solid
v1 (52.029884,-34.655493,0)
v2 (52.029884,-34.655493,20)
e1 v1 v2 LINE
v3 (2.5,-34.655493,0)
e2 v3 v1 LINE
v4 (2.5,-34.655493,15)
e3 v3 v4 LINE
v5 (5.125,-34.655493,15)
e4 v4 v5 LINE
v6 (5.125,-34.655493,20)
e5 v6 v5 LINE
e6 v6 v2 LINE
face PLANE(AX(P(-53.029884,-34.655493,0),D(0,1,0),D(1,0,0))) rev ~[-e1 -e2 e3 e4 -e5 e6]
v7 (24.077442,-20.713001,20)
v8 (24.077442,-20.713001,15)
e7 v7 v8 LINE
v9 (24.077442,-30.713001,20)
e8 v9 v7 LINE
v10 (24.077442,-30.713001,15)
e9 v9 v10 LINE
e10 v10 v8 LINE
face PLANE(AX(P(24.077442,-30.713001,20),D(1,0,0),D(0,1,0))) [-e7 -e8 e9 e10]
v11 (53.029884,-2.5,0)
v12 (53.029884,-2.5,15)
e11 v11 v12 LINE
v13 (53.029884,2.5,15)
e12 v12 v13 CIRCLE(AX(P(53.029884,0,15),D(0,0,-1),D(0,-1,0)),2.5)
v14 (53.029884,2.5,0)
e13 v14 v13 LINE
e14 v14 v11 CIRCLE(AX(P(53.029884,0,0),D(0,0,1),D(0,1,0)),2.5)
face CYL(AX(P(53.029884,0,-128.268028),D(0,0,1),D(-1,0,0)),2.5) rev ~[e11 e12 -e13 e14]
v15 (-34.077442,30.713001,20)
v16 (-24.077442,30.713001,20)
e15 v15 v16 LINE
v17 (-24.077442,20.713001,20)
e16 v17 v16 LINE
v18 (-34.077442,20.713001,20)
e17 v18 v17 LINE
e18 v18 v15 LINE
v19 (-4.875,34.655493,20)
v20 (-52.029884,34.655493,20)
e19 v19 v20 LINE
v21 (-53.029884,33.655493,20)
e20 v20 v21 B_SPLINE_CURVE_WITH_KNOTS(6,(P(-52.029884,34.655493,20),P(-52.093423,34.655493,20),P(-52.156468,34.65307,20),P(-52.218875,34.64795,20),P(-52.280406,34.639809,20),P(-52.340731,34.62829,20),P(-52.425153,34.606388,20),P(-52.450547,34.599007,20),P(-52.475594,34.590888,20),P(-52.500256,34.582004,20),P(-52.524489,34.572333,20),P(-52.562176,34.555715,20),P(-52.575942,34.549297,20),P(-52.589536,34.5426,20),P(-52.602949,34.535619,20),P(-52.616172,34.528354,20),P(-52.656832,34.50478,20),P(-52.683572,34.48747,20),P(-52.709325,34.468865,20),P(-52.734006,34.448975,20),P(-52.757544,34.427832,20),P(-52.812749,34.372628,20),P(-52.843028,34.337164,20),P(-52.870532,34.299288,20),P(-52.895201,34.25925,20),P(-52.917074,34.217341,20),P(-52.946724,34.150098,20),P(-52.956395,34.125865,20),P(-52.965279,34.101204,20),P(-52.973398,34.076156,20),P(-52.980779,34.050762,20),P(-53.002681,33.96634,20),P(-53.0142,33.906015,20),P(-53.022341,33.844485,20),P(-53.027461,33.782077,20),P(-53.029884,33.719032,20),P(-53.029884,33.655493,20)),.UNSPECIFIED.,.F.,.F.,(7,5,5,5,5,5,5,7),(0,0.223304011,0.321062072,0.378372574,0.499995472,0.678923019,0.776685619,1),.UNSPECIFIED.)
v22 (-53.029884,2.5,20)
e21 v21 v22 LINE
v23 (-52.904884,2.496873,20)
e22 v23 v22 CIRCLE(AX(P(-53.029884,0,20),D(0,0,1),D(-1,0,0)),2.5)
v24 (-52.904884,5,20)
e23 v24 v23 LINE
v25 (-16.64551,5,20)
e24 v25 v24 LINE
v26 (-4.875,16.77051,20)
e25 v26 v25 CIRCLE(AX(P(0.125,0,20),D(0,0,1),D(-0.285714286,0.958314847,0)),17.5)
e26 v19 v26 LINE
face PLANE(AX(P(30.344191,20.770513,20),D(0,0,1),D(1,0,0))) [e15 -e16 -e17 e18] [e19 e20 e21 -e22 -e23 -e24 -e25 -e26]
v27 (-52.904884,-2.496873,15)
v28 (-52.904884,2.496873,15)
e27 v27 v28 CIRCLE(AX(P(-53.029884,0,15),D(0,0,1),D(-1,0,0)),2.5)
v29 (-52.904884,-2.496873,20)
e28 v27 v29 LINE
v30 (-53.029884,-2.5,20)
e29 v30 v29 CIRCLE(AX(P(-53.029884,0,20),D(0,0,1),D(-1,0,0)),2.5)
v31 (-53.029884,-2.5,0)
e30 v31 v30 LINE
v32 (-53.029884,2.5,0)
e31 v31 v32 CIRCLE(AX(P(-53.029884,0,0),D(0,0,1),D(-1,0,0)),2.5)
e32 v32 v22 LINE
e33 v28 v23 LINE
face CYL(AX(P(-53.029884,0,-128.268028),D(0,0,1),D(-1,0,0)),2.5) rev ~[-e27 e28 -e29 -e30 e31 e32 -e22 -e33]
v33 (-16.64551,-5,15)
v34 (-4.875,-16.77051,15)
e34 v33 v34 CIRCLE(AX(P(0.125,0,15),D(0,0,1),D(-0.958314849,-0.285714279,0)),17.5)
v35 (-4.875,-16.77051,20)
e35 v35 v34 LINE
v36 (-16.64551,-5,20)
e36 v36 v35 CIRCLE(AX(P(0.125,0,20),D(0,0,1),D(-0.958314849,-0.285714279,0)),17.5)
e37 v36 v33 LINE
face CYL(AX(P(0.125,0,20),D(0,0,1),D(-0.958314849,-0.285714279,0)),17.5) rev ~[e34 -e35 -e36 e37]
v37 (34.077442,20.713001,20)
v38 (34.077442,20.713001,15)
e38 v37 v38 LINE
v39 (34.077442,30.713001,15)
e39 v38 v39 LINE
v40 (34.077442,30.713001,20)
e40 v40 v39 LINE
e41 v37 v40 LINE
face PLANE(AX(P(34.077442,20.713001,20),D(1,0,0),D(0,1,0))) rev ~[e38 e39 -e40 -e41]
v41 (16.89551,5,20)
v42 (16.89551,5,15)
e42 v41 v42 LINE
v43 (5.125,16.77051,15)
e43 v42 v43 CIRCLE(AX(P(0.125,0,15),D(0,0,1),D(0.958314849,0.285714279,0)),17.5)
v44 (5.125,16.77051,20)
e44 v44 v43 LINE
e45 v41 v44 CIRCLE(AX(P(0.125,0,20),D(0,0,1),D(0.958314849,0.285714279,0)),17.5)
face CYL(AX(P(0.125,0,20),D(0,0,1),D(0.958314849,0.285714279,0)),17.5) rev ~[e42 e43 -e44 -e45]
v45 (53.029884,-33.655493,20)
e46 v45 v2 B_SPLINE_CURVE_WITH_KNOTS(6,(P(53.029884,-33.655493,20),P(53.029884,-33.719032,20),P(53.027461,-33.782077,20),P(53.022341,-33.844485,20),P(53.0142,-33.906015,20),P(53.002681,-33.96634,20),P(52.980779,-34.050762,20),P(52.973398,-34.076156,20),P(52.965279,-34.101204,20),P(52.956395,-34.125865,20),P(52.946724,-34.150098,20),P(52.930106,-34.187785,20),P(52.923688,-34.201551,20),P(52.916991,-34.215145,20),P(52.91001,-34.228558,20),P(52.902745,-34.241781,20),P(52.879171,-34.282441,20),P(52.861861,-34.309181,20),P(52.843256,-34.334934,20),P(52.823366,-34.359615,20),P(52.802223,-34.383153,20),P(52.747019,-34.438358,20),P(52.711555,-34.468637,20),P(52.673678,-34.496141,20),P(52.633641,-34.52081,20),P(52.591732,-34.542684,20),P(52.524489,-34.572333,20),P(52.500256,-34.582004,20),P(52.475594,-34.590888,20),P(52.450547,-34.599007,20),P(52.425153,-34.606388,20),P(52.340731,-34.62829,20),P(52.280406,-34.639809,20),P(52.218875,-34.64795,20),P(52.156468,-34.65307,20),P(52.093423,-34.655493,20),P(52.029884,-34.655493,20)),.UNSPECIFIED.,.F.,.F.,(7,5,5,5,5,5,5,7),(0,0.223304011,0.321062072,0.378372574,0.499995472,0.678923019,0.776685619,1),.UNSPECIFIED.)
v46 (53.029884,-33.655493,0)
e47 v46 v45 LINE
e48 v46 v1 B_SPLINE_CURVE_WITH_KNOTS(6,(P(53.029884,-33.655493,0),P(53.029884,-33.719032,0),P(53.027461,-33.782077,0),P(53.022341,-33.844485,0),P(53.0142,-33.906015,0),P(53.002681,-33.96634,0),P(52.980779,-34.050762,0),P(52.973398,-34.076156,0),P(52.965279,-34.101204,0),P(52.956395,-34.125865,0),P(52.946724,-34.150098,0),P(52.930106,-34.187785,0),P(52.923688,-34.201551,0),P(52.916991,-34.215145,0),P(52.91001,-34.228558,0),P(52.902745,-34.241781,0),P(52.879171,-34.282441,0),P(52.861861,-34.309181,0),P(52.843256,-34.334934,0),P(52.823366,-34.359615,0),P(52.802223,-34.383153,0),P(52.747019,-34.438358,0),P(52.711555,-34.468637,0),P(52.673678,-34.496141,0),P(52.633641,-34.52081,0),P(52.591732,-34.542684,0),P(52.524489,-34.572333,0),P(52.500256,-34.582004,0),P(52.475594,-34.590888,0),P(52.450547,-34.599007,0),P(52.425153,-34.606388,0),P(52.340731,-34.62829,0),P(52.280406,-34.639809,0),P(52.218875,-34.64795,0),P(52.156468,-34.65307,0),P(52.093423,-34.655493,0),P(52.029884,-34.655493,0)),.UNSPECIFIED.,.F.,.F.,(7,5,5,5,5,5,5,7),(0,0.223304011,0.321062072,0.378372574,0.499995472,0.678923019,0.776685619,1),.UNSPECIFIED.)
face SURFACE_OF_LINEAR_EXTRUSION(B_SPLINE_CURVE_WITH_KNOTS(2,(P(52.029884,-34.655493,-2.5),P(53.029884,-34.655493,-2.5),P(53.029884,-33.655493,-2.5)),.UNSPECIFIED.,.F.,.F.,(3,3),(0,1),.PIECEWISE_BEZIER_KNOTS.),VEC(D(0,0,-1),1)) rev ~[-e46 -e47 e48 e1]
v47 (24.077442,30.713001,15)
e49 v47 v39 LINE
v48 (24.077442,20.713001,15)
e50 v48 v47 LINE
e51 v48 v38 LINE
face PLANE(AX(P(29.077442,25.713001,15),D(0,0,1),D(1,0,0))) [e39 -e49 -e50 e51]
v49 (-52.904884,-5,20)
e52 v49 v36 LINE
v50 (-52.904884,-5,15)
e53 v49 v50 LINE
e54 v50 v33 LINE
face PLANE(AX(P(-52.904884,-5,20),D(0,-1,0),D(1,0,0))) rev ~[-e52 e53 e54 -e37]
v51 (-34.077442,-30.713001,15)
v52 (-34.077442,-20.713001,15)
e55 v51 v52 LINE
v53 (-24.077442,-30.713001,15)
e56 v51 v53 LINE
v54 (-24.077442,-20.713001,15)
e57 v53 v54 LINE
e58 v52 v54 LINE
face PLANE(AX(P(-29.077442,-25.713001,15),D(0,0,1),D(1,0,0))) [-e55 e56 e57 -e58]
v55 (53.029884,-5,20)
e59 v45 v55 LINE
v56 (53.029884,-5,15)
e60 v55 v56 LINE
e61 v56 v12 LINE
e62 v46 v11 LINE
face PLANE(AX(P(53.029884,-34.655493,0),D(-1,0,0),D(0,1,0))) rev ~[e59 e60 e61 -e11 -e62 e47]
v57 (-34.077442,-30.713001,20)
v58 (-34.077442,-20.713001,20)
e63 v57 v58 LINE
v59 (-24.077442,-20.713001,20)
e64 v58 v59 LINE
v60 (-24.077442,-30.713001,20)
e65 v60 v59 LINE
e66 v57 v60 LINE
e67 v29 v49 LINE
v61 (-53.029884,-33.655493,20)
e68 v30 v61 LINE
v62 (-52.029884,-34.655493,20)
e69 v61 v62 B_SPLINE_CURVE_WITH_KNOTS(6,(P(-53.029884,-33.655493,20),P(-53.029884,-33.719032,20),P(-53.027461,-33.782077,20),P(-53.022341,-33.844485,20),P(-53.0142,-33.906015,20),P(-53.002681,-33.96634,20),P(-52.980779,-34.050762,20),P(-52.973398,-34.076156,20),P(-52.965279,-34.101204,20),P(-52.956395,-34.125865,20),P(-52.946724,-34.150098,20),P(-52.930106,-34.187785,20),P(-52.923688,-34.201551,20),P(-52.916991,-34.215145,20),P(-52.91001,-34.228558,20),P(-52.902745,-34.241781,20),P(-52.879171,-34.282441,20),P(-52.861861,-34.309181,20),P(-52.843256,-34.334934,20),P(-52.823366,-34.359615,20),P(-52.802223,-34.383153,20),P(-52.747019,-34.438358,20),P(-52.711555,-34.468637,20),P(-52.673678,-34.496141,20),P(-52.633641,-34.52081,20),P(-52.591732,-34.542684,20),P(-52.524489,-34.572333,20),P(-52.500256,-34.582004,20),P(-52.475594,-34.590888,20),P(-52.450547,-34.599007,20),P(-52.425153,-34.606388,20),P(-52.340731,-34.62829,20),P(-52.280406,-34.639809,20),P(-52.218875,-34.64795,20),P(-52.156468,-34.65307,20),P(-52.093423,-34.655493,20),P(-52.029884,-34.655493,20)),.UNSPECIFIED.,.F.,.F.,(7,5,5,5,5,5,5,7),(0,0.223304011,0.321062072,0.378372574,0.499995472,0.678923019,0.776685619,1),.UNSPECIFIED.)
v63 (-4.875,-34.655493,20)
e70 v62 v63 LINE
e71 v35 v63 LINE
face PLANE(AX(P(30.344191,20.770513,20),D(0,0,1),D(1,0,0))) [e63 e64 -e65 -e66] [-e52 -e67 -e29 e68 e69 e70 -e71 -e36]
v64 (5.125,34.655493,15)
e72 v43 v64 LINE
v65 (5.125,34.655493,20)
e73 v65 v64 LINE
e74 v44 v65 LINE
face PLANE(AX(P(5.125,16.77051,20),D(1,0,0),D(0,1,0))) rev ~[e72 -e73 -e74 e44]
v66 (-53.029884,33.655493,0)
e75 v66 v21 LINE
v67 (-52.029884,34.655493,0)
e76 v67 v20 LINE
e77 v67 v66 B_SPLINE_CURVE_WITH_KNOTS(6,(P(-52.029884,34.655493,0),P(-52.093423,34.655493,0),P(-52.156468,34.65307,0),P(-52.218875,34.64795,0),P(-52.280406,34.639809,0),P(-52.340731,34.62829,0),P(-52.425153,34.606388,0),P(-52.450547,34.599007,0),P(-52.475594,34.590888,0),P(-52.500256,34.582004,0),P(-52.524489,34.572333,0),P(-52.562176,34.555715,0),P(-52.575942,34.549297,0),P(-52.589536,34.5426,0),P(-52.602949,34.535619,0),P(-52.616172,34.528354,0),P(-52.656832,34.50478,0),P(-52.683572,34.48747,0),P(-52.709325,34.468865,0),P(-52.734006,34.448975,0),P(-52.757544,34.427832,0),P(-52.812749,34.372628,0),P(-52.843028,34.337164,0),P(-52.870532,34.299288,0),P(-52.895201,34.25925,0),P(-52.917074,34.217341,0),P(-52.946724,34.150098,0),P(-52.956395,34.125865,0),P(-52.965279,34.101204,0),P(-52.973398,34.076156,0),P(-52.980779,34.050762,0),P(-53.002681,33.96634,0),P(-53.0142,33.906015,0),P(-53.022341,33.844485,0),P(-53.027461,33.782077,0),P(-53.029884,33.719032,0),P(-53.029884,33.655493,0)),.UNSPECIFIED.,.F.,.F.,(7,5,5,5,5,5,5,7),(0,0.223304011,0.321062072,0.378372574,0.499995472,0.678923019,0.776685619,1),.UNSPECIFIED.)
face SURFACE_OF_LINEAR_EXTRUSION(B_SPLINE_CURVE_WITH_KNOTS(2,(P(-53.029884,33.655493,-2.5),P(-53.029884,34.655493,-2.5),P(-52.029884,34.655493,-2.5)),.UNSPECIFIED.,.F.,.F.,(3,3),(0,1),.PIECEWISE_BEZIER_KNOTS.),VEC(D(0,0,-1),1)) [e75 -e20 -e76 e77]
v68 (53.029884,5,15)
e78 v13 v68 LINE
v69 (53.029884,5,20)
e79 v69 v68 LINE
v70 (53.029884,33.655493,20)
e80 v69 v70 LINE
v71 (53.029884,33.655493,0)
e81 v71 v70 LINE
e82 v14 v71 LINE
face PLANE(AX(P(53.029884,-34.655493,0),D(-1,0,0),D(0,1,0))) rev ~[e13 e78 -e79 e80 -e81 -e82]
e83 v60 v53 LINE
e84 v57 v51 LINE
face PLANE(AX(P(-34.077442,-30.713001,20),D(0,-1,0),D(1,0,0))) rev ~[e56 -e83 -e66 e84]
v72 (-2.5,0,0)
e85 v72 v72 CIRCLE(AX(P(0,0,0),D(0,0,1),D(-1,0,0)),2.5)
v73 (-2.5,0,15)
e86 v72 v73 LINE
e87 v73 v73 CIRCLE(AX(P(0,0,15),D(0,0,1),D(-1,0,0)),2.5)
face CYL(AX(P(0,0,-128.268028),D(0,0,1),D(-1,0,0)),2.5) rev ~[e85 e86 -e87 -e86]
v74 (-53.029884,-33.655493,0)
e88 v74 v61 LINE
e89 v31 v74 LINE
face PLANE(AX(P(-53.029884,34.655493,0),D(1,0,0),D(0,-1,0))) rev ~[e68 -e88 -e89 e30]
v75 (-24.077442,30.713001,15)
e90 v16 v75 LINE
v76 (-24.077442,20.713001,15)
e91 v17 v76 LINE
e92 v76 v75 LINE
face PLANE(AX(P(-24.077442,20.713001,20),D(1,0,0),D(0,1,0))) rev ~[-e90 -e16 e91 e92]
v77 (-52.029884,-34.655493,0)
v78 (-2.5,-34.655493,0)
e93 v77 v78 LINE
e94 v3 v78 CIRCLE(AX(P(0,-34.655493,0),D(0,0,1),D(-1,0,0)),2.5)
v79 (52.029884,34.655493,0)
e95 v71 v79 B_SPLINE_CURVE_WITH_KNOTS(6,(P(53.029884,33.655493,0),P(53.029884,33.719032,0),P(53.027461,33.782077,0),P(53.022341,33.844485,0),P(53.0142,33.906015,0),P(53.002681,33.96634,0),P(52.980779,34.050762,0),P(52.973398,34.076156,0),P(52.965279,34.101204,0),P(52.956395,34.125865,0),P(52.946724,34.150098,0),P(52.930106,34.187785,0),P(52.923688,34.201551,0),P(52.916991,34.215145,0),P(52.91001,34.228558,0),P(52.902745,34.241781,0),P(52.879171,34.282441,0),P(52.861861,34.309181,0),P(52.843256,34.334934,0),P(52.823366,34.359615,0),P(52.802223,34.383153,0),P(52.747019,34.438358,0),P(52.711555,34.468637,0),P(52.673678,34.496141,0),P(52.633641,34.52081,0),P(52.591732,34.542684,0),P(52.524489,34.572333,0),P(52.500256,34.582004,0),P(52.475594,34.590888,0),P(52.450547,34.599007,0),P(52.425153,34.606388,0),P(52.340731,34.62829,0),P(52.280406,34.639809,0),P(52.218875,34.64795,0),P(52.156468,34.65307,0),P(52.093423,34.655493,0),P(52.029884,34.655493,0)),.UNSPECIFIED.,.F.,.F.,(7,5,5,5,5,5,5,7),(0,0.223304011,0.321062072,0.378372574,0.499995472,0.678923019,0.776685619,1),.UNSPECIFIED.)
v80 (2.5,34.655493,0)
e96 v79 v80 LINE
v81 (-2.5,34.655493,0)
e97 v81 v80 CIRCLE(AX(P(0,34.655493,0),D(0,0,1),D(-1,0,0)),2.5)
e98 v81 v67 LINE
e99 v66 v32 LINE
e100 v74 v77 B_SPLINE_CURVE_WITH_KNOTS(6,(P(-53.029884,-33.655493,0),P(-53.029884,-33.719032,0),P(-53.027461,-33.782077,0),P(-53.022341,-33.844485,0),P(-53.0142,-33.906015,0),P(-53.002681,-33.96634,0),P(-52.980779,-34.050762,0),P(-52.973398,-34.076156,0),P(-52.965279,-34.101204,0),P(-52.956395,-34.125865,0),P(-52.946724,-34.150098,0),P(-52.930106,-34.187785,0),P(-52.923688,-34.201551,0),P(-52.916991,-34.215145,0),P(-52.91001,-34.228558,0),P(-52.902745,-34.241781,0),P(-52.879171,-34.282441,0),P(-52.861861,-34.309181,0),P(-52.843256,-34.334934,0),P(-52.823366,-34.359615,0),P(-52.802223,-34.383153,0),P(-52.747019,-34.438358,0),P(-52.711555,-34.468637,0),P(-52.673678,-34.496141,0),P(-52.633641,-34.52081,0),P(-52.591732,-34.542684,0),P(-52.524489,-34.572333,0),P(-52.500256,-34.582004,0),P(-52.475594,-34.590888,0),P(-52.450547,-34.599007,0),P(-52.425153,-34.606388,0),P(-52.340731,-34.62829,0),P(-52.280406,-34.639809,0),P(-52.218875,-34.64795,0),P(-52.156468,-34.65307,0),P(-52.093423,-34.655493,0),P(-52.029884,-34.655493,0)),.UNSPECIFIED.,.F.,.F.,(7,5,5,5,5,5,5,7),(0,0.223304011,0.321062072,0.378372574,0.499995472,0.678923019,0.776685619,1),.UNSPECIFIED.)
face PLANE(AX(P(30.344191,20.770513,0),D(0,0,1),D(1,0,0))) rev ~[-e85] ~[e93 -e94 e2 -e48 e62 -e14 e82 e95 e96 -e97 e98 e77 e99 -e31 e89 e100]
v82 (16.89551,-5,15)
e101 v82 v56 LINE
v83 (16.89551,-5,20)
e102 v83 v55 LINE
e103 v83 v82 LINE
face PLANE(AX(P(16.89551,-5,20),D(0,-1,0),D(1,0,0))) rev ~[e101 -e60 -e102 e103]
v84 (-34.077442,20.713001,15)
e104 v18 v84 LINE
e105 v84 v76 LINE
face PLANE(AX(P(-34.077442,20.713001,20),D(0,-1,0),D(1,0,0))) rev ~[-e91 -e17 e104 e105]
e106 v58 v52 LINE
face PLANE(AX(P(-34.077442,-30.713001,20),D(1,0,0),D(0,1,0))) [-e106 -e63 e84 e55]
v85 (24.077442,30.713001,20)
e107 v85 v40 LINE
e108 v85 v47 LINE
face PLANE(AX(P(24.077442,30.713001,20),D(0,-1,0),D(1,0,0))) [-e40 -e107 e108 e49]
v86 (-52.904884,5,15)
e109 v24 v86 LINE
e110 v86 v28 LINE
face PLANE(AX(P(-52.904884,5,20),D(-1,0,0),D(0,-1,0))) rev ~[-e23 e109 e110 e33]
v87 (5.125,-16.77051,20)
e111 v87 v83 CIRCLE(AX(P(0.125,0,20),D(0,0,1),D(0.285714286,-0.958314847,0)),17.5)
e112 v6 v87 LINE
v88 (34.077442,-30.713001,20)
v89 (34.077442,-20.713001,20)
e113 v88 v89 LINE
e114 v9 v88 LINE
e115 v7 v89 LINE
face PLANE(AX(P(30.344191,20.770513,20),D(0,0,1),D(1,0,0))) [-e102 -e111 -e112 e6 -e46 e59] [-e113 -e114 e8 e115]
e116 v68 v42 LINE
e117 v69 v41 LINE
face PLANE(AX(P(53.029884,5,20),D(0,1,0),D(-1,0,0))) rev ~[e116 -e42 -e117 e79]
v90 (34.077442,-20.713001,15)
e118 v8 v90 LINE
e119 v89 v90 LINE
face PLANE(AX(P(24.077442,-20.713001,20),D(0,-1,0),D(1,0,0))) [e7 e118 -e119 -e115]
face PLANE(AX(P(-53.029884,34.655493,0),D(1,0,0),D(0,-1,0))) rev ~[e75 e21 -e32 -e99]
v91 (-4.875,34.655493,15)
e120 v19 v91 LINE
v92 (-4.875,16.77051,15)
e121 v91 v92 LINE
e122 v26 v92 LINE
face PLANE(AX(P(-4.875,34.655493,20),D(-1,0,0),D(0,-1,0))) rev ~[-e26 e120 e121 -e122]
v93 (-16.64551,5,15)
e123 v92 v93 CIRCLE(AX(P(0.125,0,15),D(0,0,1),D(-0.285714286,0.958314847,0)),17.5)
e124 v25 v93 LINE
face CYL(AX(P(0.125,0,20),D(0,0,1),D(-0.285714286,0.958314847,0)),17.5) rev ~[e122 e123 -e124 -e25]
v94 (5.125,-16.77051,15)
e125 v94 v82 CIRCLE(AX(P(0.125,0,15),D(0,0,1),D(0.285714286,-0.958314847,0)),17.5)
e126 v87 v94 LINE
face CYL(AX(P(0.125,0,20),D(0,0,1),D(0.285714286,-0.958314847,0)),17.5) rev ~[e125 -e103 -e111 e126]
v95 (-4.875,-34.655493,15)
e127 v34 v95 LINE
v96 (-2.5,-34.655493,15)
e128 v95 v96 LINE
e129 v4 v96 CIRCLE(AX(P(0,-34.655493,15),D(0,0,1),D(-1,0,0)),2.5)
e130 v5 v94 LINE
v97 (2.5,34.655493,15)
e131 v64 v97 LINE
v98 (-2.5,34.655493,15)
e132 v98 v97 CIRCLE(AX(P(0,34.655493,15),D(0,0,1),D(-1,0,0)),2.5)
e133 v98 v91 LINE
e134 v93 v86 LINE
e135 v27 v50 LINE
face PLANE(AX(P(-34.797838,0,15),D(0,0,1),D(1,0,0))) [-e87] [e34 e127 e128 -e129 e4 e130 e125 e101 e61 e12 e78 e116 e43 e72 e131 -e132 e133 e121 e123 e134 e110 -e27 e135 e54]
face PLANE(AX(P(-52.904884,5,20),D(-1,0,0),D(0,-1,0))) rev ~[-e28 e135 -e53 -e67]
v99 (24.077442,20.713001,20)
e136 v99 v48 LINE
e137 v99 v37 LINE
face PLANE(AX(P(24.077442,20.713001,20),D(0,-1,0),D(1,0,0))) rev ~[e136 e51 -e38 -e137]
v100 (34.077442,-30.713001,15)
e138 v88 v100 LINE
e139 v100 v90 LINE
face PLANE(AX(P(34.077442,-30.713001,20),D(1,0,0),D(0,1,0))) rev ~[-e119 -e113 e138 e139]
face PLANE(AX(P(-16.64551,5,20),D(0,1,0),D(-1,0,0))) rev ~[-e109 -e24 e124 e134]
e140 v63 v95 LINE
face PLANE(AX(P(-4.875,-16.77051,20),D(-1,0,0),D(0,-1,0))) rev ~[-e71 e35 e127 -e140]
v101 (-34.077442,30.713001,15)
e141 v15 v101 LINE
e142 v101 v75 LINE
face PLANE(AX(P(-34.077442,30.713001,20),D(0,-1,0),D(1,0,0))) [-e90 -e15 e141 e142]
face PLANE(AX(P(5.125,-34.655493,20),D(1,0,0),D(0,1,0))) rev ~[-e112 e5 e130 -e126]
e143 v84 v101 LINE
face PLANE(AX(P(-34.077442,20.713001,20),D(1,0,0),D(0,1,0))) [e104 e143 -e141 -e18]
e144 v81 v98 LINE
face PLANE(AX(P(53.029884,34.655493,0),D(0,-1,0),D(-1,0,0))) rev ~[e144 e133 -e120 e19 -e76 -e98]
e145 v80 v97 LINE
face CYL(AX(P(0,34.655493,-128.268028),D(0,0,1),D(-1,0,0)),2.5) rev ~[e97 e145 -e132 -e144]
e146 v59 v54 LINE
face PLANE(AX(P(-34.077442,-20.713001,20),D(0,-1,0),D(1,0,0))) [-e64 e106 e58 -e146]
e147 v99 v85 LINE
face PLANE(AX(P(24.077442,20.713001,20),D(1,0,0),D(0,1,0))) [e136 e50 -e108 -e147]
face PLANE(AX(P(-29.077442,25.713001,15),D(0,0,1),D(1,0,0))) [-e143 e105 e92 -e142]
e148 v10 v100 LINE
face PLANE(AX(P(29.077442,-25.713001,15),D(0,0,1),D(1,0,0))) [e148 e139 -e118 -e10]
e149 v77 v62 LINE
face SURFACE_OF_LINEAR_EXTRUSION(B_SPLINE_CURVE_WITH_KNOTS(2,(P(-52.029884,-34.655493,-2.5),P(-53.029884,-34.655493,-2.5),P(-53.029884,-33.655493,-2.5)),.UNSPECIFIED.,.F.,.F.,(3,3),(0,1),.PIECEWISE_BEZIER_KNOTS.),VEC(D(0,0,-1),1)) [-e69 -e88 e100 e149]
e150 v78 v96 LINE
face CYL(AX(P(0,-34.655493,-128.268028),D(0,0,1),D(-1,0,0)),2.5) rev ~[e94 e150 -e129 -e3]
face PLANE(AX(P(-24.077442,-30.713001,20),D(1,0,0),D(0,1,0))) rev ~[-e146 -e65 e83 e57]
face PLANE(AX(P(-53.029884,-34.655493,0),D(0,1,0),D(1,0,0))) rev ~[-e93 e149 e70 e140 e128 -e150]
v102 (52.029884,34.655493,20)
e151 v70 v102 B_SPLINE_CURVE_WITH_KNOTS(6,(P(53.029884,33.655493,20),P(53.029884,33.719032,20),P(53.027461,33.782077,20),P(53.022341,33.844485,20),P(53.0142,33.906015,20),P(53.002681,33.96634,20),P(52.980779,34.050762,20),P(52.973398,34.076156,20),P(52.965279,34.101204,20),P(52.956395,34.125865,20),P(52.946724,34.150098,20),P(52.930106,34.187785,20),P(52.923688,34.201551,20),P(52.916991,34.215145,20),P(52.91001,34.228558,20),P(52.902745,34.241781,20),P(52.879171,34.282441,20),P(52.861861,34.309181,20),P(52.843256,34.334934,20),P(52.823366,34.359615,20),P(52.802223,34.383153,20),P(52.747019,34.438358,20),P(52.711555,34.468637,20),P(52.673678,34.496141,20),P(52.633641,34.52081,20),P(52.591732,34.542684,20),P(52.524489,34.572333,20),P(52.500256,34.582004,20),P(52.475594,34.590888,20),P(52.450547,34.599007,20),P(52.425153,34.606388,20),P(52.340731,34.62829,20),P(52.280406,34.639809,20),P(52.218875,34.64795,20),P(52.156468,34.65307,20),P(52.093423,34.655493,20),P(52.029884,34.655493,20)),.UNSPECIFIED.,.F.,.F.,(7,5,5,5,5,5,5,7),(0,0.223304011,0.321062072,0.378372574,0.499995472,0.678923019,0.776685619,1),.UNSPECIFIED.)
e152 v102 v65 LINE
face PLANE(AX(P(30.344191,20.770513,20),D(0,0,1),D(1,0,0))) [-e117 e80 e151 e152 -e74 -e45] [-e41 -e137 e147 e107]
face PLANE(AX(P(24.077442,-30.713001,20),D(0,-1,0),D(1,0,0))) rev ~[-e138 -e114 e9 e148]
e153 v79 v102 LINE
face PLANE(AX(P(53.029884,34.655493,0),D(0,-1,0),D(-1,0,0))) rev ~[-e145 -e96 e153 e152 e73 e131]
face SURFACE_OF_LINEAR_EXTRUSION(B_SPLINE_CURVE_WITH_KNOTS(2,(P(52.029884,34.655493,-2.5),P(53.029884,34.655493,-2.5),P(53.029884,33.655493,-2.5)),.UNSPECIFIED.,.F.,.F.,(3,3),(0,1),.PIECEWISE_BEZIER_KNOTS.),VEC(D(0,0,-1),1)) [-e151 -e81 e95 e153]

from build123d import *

# Parameters (mm, degrees)
F1_DEPTH    = 20
F3_DEPTH    = 5
F4_W        = 10
F4_H        = 10
F5_DEPTH    = 5
F6_D        = 5
F7_D        = 5
F8_T1_DEPTH = 25


# Not quite as in the source:
# - a fillet or chamfer that OpenCascade refuses, or shapes differently, is made with other operations: its cross-section is extruded or revolved along the edge and cut away or added


with BuildPart() as f1:
    # F0 (on Top) → F1 (new body)
    with BuildSketch(Plane.XY):
        with BuildLine():
            Line((16.7705098646, 4.9999998882), (53.0298836529, 4.9999998882))
            Line((53.0298836529, 4.9999998882), (53.0298836529, 34.6554927528))
            Line((53.0298836529, 34.6554927528), (5, 34.6554927528))
            Line((5, 34.6554927528), (5, 16.7705098312))
            ThreePointArc((5, 16.7705098312), (12.374368712, 12.3743686295), (16.7705098646, 4.9999998882))
        make_face()
        with BuildLine():
            Line((5, 16.7705098312), (5, 34.6554927528))
            Line((5, 34.6554927528), (-5, 34.6554927528))
            Line((-5, 34.6554927528), (-5, 16.7705098312))
            ThreePointArc((-5, 16.7705098312), (0, 17.5), (5, 16.7705098312))
        make_face()
        with BuildLine():
            Line((-53.0298836529, 34.6554927528), (-53.0298836529, 4.9999998882))
            Line((-53.0298836529, 4.9999998882), (-16.7705098646, 4.9999998882))
            ThreePointArc((-16.7705098646, 4.9999998882), (-12.374368712, 12.3743686295), (-5, 16.7705098312))
            Line((-5, 16.7705098312), (-5, 34.6554927528))
            Line((-5, 34.6554927528), (-53.0298836529, 34.6554927528))
        make_face()
        with BuildLine():
            Line((-53.0298836529, -34.6554927528), (-5, -34.6554927528))
            Line((-5, -34.6554927528), (-5, -16.7705098312))
            ThreePointArc((-5, -16.7705098312), (-12.374368712, -12.3743686295), (-16.7705098646, -4.9999998882))
            Line((-16.7705098646, -4.9999998882), (-53.0298836529, -4.9999998882))
            Line((-53.0298836529, -4.9999998882), (-53.0298836529, -34.6554927528))
        make_face()
        with BuildLine():
            Line((5, -34.6554927528), (53.0298836529, -34.6554927528))
            Line((53.0298836529, -34.6554927528), (53.0298836529, -4.9999998882))
            Line((53.0298836529, -4.9999998882), (16.7705098646, -4.9999998882))
            ThreePointArc((16.7705098646, -4.9999998882), (12.374368712, -12.3743686295), (5, -16.7705098312))
            Line((5, -16.7705098312), (5, -34.6554927528))
        make_face()
        with BuildLine():
            Line((16.7705098646, -4.9999998882), (53.0298836529, -4.9999998882))
            Line((53.0298836529, -4.9999998882), (53.0298836529, 4.9999998882))
            Line((53.0298836529, 4.9999998882), (16.7705098646, 4.9999998882))
            ThreePointArc((16.7705098646, 4.9999998882), (17.3166671538, 2.5264676299), (17.5, 0))
            ThreePointArc((17.5, 0), (17.3166671538, -2.5264676299), (16.7705098646, -4.9999998882))
        make_face()
        with BuildLine():
            ThreePointArc((-5, -16.7705098312), (0, -17.5), (5, -16.7705098312))
            ThreePointArc((5, -16.7705098312), (12.374368712, -12.3743686295), (16.7705098646, -4.9999998882))
            ThreePointArc((16.7705098646, -4.9999998882), (17.3166671538, -2.5264676299), (17.5, 0))
            ThreePointArc((17.5, 0), (17.3166671538, 2.5264676299), (16.7705098646, 4.9999998882))
            ThreePointArc((16.7705098646, 4.9999998882), (12.374368712, 12.3743686295), (5, 16.7705098312))
            ThreePointArc((5, 16.7705098312), (0, 17.5), (-5, 16.7705098312))
            ThreePointArc((-5, 16.7705098312), (-12.374368712, 12.3743686295), (-16.7705098646, 4.9999998882))
            ThreePointArc((-16.7705098646, 4.9999998882), (-17.5, 0), (-16.7705098646, -4.9999998882))
            ThreePointArc((-16.7705098646, -4.9999998882), (-12.374368712, -12.3743686295), (-5, -16.7705098312))
        make_face()
        with BuildLine():
            Line((-53.0298836529, 4.9999998882), (-53.0298836529, -4.9999998882))
            Line((-53.0298836529, -4.9999998882), (-16.7705098646, -4.9999998882))
            ThreePointArc((-16.7705098646, -4.9999998882), (-17.5, 0), (-16.7705098646, 4.9999998882))
            Line((-16.7705098646, 4.9999998882), (-53.0298836529, 4.9999998882))
        make_face()
        with BuildLine():
            Line((-5, -34.6554927528), (5, -34.6554927528))
            Line((5, -34.6554927528), (5, -16.7705098312))
            ThreePointArc((5, -16.7705098312), (0, -17.5), (-5, -16.7705098312))
            Line((-5, -16.7705098312), (-5, -34.6554927528))
        make_face()
    extrude(amount=F1_DEPTH)

    # F2 (on face) → F3 (cut)
    with BuildSketch(Plane.XY.offset(20)):
        with BuildLine():
            Line((-52.9048836529, 4.9999998882), (-52.9048836529, -4.9999998882))
            Line((-52.9048836529, -4.9999998882), (-16.6455098646, -4.9999998882))
            ThreePointArc((-16.6455098646, -4.9999998882), (-17.375, 0), (-16.6455098646, 4.9999998882))
            Line((-16.6455098646, 4.9999998882), (-52.9048836529, 4.9999998882))
        make_face()
        with BuildLine():
            ThreePointArc((-4.875, 16.7705098312), (0.125, 17.5), (5.125, 16.7705098312))
            Line((5.125, 16.7705098312), (5.125, 34.6554927528))
            Line((5.125, 34.6554927528), (-4.875, 34.6554927528))
            Line((-4.875, 34.6554927528), (-4.875, 16.7705098312))
        make_face()
        with BuildLine():
            ThreePointArc((-4.875, -16.7705098312), (0.125, -17.5), (5.125, -16.7705098312))
            ThreePointArc((5.125, -16.7705098312), (12.499368712, -12.3743686295), (16.8955098646, -4.9999998882))
            ThreePointArc((16.8955098646, -4.9999998882), (17.4416671538, -2.5264676299), (17.625, 0))
            ThreePointArc((17.625, 0), (17.4416671538, 2.5264676299), (16.8955098646, 4.9999998882))
            ThreePointArc((16.8955098646, 4.9999998882), (12.499368712, 12.3743686295), (5.125, 16.7705098312))
            ThreePointArc((5.125, 16.7705098312), (0.125, 17.5), (-4.875, 16.7705098312))
            ThreePointArc((-4.875, 16.7705098312), (-12.249368712, 12.3743686295), (-16.6455098646, 4.9999998882))
            ThreePointArc((-16.6455098646, 4.9999998882), (-17.375, 0), (-16.6455098646, -4.9999998882))
            ThreePointArc((-16.6455098646, -4.9999998882), (-12.249368712, -12.3743686295), (-4.875, -16.7705098312))
        make_face()
        with BuildLine():
            Line((16.8955098646, -4.9999998882), (53.0298836529, -4.9999998882))
            Line((53.0298836529, -4.9999998882), (53.0298836529, 4.9999998882))
            Line((53.0298836529, 4.9999998882), (16.8955098646, 4.9999998882))
            ThreePointArc((16.8955098646, 4.9999998882), (17.4416671538, 2.5264676299), (17.625, 0))
            ThreePointArc((17.625, 0), (17.4416671538, -2.5264676299), (16.8955098646, -4.9999998882))
        make_face()
        with BuildLine():
            Line((-4.875, -34.6554927528), (5.125, -34.6554927528))
            Line((5.125, -34.6554927528), (5.125, -16.7705098312))
            ThreePointArc((5.125, -16.7705098312), (0.125, -17.5), (-4.875, -16.7705098312))
            Line((-4.875, -16.7705098312), (-4.875, -34.6554927528))
        make_face()
    extrude(amount=-F3_DEPTH, mode=Mode.SUBTRACT)

    # F4 (on face) → F5 (cut)
    with BuildSketch(Plane.XY.offset(20)):
        with Locations((-29.0774418265, 25.713001292)):
            Rectangle(F4_W, F4_H)
        with Locations((29.0774418265, 25.713001292)):
            Rectangle(F4_W, F4_H)
        with Locations((29.0774418265, -25.713001292)):
            Rectangle(F4_W, F4_H)
        with Locations((-29.0774418265, -25.713001292)):
            Rectangle(F4_W, F4_H)
    extrude(amount=-F5_DEPTH, mode=Mode.SUBTRACT)

    # F6 (through all)
    with Locations(Plane(origin=(0, 0, 0), x_dir=(1, 0, 0), z_dir=(0, 0, -1))):
        with Locations((0, 34.6554927528), (0, -34.6554927528), (-53.0298836529, 0), (0, 0)):
            Hole(F6_D / 2)

    # F7 (through all)
    with Locations(Plane(origin=(0, 0, 0), x_dir=(1, 0, 0), z_dir=(0, 0, -1))):
        with Locations((53.0298836529, 0)):
            Hole(F7_D / 2)

    # F8: fillet of radius 1 on 4 edges, made by hand

    # F8_s2 → F8_t1 (cut)
    with BuildSketch(Plane.XY.offset(-2.5)):
        with BuildLine():
            add(Edge.make_bspline(
                [(52.0298836529, -34.6554927528), (53.0298836529, -34.6554927528), (53.0298836529, -33.6554927528)],
                knots=[0, 0, 0, 1, 1, 1], degree=2, weights=[1, 1, 1]))
            Line((53.0298836529, -33.6554927528), (53.0298836529, -34.6554927528))
            Line((53.0298836529, -34.6554927528), (52.0298836529, -34.6554927528))
        make_face()
        with BuildLine():
            add(Edge.make_bspline(
                [(52.0298836529, 34.6554927528), (53.0298836529, 34.6554927528), (53.0298836529, 33.6554927528)],
                knots=[0, 0, 0, 1, 1, 1], degree=2, weights=[1, 1, 1]))
            Line((53.0298836529, 33.6554927528), (53.0298836529, 34.6554927528))
            Line((53.0298836529, 34.6554927528), (52.0298836529, 34.6554927528))
        make_face()
        with BuildLine():
            add(Edge.make_bspline(
                [(-52.0298836529, -34.6554927528), (-53.0298836529, -34.6554927528), (-53.0298836529, -33.6554927528)],
                knots=[0, 0, 0, 1, 1, 1], degree=2, weights=[1, 1, 1]))
            Line((-53.0298836529, -33.6554927528), (-53.0298836529, -34.6554927528))
            Line((-53.0298836529, -34.6554927528), (-52.0298836529, -34.6554927528))
        make_face()
        with BuildLine():
            add(Edge.make_bspline(
                [(-53.0298836529, 33.6554927528), (-53.0298836529, 34.6554927528), (-52.0298836529, 34.6554927528)],
                knots=[0, 0, 0, 1, 1, 1], degree=2, weights=[1, 1, 1]))
            Line((-52.0298836529, 34.6554927528), (-53.0298836529, 34.6554927528))
            Line((-53.0298836529, 34.6554927528), (-53.0298836529, 33.6554927528))
        make_face()
    extrude(amount=F8_T1_DEPTH, mode=Mode.SUBTRACT)


solid = f1.part
